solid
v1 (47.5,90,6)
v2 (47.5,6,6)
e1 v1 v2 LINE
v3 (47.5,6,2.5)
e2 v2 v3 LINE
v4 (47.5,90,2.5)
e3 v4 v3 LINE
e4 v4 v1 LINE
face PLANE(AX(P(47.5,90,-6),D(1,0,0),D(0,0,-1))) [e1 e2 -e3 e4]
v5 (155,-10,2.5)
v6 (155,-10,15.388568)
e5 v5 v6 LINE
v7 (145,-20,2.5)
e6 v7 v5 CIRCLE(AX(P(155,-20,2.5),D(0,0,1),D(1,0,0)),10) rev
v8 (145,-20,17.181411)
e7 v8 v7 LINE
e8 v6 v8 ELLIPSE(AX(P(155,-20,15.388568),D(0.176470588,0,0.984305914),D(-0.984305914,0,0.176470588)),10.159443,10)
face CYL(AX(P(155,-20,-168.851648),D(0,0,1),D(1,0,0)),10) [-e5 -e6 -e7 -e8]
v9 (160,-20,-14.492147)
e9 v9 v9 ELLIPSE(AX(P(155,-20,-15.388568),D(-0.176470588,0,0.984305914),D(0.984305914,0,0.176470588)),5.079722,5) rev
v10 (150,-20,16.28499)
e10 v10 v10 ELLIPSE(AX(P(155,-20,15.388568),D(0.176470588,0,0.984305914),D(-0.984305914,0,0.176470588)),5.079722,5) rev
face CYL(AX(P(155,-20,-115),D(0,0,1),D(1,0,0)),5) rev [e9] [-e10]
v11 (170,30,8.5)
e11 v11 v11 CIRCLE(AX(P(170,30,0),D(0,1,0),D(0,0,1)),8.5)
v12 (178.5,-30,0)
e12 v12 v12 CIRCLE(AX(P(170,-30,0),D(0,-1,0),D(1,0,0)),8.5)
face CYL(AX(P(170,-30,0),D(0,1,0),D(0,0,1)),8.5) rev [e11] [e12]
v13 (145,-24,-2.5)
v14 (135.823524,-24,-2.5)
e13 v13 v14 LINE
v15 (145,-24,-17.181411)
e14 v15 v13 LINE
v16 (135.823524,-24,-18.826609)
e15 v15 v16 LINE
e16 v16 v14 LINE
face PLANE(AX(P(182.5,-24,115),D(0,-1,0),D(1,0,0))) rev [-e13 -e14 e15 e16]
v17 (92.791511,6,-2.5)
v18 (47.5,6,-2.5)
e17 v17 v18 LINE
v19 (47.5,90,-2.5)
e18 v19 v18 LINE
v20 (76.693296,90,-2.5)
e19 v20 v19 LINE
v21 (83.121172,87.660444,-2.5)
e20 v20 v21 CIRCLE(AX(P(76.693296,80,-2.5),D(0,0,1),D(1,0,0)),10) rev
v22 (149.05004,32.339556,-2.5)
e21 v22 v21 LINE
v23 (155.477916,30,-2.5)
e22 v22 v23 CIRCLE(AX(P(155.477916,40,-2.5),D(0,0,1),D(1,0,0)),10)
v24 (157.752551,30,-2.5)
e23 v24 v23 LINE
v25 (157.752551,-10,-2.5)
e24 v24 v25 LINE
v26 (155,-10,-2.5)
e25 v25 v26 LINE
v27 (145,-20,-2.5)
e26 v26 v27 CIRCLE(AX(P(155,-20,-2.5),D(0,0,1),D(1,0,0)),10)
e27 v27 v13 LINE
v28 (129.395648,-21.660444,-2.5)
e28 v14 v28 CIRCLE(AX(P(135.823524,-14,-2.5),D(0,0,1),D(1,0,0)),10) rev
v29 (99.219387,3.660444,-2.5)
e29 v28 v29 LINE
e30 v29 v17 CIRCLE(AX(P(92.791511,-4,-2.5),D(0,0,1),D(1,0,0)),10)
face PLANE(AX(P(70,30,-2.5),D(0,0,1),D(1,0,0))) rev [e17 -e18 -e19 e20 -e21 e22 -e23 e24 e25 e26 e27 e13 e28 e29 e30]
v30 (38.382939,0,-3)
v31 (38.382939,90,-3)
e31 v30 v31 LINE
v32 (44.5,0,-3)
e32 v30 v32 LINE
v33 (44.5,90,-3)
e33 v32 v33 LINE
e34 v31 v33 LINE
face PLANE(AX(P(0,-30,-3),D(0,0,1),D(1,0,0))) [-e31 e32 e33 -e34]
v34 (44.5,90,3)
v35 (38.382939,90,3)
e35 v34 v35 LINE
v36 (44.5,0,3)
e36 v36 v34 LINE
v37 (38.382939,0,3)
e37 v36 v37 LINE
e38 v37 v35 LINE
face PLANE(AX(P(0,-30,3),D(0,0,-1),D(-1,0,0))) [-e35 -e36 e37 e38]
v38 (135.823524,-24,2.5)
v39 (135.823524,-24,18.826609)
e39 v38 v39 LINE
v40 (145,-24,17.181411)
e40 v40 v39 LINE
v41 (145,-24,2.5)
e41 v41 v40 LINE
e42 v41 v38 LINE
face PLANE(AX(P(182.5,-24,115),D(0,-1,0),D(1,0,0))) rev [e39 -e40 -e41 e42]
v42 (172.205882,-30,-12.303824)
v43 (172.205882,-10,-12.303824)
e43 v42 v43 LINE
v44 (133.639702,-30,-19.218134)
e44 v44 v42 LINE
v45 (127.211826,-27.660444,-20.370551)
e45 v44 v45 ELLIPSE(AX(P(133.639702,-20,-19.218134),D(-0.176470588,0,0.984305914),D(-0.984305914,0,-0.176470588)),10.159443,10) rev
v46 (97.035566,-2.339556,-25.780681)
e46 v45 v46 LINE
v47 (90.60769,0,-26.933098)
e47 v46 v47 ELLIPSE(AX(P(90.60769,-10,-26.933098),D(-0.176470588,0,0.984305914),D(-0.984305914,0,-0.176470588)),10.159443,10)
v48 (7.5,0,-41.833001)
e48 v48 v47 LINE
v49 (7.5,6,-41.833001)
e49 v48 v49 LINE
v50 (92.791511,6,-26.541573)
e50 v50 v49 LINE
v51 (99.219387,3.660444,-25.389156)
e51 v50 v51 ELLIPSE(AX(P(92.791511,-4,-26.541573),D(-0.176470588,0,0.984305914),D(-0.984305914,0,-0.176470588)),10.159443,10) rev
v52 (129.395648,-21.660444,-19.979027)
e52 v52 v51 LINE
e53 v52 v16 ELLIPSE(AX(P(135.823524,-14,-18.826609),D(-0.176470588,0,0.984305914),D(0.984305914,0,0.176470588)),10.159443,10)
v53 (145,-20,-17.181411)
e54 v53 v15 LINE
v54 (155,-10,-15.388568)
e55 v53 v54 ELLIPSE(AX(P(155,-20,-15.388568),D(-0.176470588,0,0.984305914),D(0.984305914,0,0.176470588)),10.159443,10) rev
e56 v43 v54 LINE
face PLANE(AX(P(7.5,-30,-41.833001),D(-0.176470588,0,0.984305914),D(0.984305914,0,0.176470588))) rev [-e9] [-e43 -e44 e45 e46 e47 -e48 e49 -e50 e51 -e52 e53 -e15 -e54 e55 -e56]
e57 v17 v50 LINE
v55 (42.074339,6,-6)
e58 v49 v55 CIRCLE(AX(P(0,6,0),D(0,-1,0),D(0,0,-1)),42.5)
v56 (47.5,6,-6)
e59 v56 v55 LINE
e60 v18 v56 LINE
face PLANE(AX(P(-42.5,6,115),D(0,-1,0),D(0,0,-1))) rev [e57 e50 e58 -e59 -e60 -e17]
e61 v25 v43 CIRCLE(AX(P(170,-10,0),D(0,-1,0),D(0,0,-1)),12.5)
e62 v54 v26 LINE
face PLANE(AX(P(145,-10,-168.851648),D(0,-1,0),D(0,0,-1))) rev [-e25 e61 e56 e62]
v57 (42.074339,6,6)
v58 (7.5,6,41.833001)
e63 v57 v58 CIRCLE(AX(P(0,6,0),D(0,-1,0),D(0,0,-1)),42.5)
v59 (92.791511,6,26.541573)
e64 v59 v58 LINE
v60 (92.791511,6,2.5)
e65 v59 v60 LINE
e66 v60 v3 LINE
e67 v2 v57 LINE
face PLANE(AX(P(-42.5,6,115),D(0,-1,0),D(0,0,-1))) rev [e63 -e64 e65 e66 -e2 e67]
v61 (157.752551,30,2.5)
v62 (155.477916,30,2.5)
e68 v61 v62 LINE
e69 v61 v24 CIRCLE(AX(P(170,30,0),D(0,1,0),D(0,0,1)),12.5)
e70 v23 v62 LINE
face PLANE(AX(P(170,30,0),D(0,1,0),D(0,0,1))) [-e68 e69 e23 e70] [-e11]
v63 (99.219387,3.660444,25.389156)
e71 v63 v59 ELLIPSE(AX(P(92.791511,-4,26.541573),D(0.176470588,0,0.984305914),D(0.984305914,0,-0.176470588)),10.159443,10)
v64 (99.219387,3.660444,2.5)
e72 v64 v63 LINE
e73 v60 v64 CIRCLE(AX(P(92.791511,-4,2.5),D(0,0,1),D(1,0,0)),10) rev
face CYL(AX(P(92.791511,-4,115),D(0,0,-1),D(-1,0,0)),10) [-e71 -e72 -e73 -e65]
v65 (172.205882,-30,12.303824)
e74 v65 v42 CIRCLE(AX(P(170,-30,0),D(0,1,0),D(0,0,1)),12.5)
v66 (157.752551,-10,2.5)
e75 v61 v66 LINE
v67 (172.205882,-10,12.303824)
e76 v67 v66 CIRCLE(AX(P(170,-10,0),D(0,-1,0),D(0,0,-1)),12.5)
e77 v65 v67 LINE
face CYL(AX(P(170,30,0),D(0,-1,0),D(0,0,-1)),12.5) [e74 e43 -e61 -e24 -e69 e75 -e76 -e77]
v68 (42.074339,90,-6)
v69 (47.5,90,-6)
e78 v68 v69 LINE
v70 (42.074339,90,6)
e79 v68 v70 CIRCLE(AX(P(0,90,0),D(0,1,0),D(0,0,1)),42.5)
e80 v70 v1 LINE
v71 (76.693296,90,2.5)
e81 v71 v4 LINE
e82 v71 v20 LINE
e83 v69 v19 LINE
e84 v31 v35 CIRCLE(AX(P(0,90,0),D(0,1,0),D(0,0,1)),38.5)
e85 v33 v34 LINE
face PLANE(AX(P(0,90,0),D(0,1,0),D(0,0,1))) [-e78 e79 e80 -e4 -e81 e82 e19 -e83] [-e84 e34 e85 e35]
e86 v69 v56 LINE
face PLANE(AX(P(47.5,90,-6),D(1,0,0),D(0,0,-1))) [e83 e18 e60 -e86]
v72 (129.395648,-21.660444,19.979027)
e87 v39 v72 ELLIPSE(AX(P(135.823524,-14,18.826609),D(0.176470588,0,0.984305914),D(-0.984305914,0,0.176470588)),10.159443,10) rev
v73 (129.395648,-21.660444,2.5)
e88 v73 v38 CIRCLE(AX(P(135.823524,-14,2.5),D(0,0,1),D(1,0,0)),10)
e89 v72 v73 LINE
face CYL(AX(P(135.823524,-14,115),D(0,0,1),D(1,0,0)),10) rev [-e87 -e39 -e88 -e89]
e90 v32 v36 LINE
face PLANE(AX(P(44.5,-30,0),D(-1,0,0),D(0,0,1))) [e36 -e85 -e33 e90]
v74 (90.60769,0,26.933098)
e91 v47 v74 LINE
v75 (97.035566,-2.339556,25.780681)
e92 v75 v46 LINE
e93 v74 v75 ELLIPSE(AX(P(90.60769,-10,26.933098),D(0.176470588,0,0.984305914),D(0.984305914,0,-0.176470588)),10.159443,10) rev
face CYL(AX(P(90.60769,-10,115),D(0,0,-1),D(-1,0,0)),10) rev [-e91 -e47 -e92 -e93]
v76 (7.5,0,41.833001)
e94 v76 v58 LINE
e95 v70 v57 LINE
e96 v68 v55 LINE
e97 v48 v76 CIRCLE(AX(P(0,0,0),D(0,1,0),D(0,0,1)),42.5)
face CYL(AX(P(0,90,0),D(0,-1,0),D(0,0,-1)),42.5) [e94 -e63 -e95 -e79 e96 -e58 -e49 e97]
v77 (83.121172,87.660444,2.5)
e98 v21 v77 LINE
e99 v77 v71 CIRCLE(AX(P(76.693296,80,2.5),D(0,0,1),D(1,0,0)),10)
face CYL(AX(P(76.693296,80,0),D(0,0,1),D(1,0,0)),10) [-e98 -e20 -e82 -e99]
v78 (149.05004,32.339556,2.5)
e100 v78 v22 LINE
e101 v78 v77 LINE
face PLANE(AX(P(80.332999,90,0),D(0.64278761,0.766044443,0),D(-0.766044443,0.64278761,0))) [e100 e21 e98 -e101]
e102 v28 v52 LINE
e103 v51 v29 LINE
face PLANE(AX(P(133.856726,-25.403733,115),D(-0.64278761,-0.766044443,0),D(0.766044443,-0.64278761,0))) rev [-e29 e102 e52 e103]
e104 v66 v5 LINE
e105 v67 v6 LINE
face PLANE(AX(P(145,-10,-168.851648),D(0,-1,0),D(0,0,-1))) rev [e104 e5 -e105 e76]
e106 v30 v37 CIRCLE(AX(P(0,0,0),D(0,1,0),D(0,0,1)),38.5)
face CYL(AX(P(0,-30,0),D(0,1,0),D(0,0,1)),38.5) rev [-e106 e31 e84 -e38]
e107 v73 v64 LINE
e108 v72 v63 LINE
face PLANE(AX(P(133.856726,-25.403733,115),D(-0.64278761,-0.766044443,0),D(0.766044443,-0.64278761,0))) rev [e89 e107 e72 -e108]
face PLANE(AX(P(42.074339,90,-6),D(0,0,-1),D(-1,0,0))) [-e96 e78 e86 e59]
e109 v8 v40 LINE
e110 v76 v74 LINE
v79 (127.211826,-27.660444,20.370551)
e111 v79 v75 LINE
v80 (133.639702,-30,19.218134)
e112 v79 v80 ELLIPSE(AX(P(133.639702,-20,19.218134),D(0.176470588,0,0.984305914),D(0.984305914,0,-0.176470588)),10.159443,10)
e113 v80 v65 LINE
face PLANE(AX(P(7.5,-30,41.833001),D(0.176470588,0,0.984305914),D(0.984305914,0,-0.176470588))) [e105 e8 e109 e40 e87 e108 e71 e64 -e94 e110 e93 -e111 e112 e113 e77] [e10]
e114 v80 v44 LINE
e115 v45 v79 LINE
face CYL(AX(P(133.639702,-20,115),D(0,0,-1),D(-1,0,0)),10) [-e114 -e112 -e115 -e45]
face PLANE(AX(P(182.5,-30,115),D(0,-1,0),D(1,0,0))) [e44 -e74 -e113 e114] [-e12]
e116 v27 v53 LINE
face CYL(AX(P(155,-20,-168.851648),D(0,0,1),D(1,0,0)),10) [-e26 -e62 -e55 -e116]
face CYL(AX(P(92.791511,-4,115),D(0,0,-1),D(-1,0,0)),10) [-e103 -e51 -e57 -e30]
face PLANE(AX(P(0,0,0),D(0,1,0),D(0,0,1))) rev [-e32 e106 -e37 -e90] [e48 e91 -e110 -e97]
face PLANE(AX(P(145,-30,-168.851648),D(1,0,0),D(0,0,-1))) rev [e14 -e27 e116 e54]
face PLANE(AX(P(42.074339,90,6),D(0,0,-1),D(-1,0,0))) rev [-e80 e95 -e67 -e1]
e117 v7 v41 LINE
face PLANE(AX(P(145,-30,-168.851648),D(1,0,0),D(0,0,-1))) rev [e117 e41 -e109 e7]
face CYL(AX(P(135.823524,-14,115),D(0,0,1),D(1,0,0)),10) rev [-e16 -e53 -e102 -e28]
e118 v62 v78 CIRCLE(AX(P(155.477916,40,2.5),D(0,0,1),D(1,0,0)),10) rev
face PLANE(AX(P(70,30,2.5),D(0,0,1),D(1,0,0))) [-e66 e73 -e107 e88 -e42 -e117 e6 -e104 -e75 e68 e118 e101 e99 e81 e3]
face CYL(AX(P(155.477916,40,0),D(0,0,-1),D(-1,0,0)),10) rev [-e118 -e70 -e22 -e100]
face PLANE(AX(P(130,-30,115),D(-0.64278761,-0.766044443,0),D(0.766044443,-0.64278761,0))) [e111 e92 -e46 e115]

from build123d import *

# Parameters (mm, degrees)
BOSS_EXTRUDE1_DEPTH     = 90
BOSS_EXTRUDE2_START     = -30
SKETCH2_3_R             = 12.5
BOSS_EXTRUDE2_DEPTH     = 60
EXTRUDE_THIN1_DEPTH     = 115
SKETCH5_W               = 50
SKETCH5_H               = 20
BOSS_EXTRUDE3_DEPTH     = 230
CUT_EXTRUDE2_DEPTH      = 315.682379551
CUT_EXTRUDE2_DEPTH_BACK = 315.682379551
SKETCH5_3_R             = 5
CUT_EXTRUDE1_START      = -30
CUT_EXTRUDE1_OUTLINE_R  = 8.5
CUT_EXTRUDE1_DEPTH      = 120
RIB1_START              = -2.5
RIB1_DEPTH              = 5
FILLET1_R               = 10


# Read off the part's stored shape, not the designer's step: Cut-Extrude1, Rib1
with BuildPart() as part:
    # Sketch2 → Boss-Extrude1 (new body)
    with BuildSketch(Plane(origin=(0, 0, 0), x_dir=(1, 0, 0), z_dir=(0, 1, 0))):
        with BuildLine():
            Line((42.074338973, 6), (47.5, 6))
            Line((47.5, 6), (47.5, -6))
            Line((47.5, -6), (42.074338973, -6))
            ThreePointArc((42.074338973, -6), (-42.5, 0), (42.074338973, 6))
        make_face()
    extrude(amount=BOSS_EXTRUDE1_DEPTH)



with BuildPart() as body_2:
    # Sketch2<3> → Boss-Extrude2 (new body)
    with BuildSketch(Plane(origin=(0, 0, 0), x_dir=(1, 0, 0), z_dir=(0, 1, 0)).offset(BOSS_EXTRUDE2_START)):
        with Locations(Location((170, 0, 0), (0, 0, 270))):
            Circle(SKETCH2_3_R)
    extrude(amount=BOSS_EXTRUDE2_DEPTH)


with BuildPart() as part_1:
    add(part.part)

    add(body_2.part)  # Extrude-Thin1 merges body 2
    # Sketch3 → Extrude-Thin1 (add, symmetric)
    with BuildSketch(Plane.XY):
        Polygon((-42.5, 0), (94.247392222, 0), (130, -30), (182.5, -30), (182.5, -24), (132.183821406, -24), (96.431213628, 6), (-42.5, 6), align=None)
    extrude(amount=EXTRUDE_THIN1_DEPTH, both=True)

    # Sketch5 → Boss-Extrude3 (add)
    with BuildSketch(Plane.XY.offset(115)):
        with Locations((170, -20)):
            Rectangle(SKETCH5_W, SKETCH5_H)
    extrude(amount=-BOSS_EXTRUDE3_DEPTH)

    # Sketch5<3> → Cut-Extrude2 (cut, two sides: drawn at the far end of the back side and taken through both)
    with BuildSketch(Plane.XY.offset(115).offset(-CUT_EXTRUDE2_DEPTH_BACK)):
        with Locations((155, -20)):
            Circle(SKETCH5_3_R)
    extrude(amount=CUT_EXTRUDE2_DEPTH + CUT_EXTRUDE2_DEPTH_BACK, mode=Mode.SUBTRACT)

    # Cut-Extrude1 outline → Cut-Extrude1 (cut)
    with BuildSketch(Plane(origin=(0, 0, 0), x_dir=(1, 0, 0), z_dir=(0, 1, 0)).offset(CUT_EXTRUDE1_START)):
        with BuildLine():
            ThreePointArc((-42.5, 2.03e-07), (-27.271780209, 32.596012091), (7.5, 41.833001327))
            Line((7.5, 41.833001327), (145, 17.181411259))
            Line((145, 17.181411259), (145, 115))
            Line((145, 115), (-42.5, 115))
            Line((-42.5, 115), (-42.5, 2.03e-07))
        make_face()
        with BuildLine():
            Line((145, 115), (145, 17.181411259))
            Line((145, 17.181411259), (172.205882353, 12.30382392))
            ThreePointArc((172.205882353, 12.30382392), (179.587062361, 8.021111849), (182.5, 0))
            ThreePointArc((182.5, 0), (179.587062361, -8.021111849), (172.205882353, -12.30382392))
            Line((172.205882353, -12.30382392), (145, -17.181411259))
            Line((145, -17.181411259), (145, -115))
            Line((145, -115), (195, -115))
            Line((195, -115), (195, 115))
            Line((195, 115), (145, 115))
        make_face()
        with BuildLine():
            ThreePointArc((7.5, -41.833001327), (-27.271780365, -32.596011961), (-42.5, 2.03e-07))
            Line((-42.5, 2.03e-07), (-42.5, -115))
            Line((-42.5, -115), (145, -115))
            Line((145, -115), (145, -17.181411259))
            Line((145, -17.181411259), (7.5, -41.833001327))
        make_face()
        with BuildLine():
            Line((44.5, 3), (38.382938918, 3))
            ThreePointArc((38.382938918, 3), (-38.5, 0), (38.382938918, -3))
            Line((38.382938918, -3), (44.5, -3))
            Line((44.5, -3), (44.5, 3))
        make_face()
        with Locations((170, 0)):
            Circle(CUT_EXTRUDE1_OUTLINE_R)
    extrude(amount=CUT_EXTRUDE1_DEPTH, mode=Mode.SUBTRACT)

    # Rib1 outline → Rib1 (add)
    with BuildSketch(Plane.XY.offset(RIB1_START)):
        Polygon((151.838214056, 30), (80.3329985, 90), (47.5, 90), (47.5, 6), (96.431213628, 6), (132.183821406, -24), (145, -24), (145, -10), (159, -10), (159, 30), align=None)
    extrude(amount=RIB1_DEPTH)

    # Fillet1
    fillet1_edges = [part_1.edges().sort_by_distance(p)[0] for p in [
        (145, -10, 9.84070563),
        (132.183821406, -24, -10.989575378),
        (96.431213628, 6, -14.194515854),
        (151.838214056, 30, 0),
        (80.3329985, 90, 0),
        (145, -10, -9.84070563),
        (94.247392222, 0, 0),
        (96.431213628, 6, 14.194515854),
        (132.183821406, -24, 10.989575378),
        (130, -30, 0),
    ]]
    fillet(fillet1_edges, radius=FILLET1_R)


solid = part_1.part
